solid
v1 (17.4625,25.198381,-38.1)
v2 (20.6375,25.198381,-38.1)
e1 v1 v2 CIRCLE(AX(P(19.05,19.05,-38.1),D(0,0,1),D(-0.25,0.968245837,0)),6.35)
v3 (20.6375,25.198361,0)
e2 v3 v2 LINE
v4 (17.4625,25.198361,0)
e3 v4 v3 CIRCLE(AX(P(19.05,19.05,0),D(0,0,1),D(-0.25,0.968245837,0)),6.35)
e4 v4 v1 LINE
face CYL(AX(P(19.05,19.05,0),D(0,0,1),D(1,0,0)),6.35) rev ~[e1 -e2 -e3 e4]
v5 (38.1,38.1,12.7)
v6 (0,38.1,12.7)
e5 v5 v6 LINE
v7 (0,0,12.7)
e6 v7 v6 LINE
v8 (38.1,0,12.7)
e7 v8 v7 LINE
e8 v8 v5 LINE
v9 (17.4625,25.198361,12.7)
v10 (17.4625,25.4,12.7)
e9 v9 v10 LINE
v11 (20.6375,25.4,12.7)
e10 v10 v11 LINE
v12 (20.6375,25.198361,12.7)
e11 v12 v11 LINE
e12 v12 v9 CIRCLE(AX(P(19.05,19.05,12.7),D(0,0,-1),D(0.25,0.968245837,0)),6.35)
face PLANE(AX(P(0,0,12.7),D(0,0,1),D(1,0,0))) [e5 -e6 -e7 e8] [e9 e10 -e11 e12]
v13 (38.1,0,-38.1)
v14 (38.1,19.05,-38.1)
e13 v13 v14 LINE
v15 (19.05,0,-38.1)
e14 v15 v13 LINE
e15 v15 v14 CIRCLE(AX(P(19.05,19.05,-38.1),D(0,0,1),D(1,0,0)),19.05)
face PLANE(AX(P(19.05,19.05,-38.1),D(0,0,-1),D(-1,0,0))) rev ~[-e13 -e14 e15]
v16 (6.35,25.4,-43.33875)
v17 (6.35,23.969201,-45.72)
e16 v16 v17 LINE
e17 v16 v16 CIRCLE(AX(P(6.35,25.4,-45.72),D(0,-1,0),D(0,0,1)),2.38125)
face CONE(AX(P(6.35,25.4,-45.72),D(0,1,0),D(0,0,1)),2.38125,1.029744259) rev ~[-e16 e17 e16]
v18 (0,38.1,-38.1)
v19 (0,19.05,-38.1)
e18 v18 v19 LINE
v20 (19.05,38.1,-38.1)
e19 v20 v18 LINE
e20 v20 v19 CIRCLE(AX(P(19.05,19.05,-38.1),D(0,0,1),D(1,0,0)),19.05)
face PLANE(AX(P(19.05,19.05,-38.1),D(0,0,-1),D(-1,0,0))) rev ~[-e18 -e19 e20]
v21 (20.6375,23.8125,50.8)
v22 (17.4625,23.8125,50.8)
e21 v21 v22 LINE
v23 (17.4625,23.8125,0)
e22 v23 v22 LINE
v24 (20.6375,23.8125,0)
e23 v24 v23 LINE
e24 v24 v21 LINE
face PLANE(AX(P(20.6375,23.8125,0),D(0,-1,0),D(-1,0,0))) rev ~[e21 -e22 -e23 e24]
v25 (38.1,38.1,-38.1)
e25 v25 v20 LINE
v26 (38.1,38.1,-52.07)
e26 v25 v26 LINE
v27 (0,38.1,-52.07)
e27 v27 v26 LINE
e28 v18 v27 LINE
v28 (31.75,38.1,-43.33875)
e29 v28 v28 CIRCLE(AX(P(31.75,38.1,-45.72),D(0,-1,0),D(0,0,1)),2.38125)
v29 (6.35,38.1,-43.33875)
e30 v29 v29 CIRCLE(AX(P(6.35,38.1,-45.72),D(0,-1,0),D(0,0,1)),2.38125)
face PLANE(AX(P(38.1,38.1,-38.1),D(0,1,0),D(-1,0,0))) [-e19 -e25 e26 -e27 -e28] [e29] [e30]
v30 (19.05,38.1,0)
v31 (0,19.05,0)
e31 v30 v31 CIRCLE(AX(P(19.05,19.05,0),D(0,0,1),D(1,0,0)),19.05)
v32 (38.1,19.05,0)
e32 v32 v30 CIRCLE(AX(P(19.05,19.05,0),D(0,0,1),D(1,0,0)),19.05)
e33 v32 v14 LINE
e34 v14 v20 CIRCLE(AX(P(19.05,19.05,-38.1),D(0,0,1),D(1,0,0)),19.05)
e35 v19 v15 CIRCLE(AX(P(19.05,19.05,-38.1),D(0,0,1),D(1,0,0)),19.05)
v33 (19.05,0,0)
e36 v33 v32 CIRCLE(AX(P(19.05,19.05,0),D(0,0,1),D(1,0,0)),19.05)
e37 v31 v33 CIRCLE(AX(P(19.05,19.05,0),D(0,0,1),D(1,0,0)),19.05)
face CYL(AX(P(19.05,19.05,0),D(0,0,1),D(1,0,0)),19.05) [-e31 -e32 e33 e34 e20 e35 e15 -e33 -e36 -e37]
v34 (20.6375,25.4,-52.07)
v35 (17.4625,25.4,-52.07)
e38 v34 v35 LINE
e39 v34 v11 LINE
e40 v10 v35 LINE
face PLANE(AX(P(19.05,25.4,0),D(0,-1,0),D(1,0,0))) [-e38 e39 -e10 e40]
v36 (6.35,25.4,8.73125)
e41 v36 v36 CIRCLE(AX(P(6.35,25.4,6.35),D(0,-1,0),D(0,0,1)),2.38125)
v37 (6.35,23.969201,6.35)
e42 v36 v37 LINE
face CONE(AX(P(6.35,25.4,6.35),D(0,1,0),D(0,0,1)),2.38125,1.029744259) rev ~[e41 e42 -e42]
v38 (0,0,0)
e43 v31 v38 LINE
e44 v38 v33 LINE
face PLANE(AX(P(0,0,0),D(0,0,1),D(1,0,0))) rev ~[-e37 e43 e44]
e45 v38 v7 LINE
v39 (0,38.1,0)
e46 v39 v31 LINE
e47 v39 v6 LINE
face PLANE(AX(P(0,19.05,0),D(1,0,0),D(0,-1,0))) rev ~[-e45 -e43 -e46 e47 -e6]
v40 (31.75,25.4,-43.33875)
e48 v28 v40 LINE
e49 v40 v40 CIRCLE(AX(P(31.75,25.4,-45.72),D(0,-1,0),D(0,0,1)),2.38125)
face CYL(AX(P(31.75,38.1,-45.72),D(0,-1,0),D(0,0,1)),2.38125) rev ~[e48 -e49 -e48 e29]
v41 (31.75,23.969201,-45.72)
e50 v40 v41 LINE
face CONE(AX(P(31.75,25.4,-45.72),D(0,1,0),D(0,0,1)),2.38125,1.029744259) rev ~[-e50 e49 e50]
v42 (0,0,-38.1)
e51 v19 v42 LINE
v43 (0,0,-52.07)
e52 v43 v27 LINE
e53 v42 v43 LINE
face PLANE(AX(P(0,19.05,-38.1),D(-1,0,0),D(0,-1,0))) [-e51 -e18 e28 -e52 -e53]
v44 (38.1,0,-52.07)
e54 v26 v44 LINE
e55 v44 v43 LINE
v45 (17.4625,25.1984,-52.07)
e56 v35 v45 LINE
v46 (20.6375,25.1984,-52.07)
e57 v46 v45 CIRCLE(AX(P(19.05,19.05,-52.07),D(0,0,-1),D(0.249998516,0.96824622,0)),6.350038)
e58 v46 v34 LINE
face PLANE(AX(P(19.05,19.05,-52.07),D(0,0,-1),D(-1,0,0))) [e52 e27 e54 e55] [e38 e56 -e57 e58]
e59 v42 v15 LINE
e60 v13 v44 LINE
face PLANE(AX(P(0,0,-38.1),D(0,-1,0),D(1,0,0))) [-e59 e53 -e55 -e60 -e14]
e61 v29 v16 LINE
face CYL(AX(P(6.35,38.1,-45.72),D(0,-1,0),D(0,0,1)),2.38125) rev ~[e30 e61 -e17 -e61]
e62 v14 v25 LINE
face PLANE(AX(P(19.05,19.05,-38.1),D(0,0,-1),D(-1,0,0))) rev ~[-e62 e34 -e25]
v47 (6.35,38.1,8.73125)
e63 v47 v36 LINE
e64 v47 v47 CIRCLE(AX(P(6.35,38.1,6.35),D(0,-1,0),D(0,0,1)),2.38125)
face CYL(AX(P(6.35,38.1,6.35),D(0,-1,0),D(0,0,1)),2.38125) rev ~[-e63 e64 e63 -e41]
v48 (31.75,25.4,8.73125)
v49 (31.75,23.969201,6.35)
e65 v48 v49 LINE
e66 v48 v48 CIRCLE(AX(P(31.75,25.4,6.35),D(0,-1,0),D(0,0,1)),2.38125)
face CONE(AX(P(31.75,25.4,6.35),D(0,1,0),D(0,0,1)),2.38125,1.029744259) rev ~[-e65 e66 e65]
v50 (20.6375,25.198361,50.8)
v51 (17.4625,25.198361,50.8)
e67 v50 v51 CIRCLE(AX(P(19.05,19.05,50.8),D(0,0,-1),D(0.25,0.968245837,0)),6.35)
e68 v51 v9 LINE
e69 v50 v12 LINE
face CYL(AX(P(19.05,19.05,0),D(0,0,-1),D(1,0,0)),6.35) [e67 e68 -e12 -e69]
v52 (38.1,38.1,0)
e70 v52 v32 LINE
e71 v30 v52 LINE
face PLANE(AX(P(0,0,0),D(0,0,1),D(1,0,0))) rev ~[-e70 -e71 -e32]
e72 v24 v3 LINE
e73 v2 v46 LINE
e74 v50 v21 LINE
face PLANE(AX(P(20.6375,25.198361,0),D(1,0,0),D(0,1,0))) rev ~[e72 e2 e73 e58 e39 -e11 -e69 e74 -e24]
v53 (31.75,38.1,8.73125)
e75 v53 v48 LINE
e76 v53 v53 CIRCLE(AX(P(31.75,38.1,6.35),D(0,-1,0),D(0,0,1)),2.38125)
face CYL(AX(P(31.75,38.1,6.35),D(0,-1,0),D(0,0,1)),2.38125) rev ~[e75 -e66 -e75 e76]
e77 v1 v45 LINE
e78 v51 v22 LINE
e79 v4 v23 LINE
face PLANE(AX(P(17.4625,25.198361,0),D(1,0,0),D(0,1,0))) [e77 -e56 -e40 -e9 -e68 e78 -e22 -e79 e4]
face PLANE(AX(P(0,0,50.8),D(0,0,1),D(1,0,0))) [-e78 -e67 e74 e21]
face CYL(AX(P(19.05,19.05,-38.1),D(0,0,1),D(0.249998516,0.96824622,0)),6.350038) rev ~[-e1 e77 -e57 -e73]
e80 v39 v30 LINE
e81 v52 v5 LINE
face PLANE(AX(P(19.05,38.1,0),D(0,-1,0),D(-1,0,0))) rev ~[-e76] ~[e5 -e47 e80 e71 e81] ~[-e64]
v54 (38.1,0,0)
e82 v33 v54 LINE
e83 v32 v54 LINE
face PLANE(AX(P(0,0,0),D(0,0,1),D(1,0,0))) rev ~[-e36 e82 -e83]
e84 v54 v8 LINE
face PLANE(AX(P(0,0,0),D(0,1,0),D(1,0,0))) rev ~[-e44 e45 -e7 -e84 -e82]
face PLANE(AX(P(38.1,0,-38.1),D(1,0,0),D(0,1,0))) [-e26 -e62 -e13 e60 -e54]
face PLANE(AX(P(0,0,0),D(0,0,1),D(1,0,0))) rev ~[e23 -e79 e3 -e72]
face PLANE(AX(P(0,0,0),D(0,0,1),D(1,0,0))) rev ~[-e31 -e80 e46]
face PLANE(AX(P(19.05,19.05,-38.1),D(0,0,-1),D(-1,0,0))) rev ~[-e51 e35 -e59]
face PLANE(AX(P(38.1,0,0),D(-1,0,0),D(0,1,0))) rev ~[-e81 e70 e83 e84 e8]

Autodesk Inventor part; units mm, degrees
ref_plane "YZ Plane" through (0, 0, 0) normal (1, 0, 0) x (0, 1, 0)
ref_plane "XZ Plane" through (0, 0, 0) normal (0, 1, 0) x (-1, 0, 0)
ref_plane "XY Plane" through (0, 0, 0) normal (0, 0, 1) x (1, 0, 0)
sketch "Sketch1" plane through (0, 0, 0) normal (0, 0, 1) x (1, 0, 0)
  line L0 (0, 0) -> (38.1, 0)
  line L1 (38.1, 0) -> (38.1, 38.1)
  line L2 (38.1, 38.1) -> (0, 38.1)
  line L3 (0, 38.1) -> (0, 0)
  circle A0 centre (19.05, 19.05) radius 6.35
  line L4 (20.6375, 23.8125) -> (17.4625, 23.8125)
  line L5 (17.4625, 25.4) -> (20.6375, 25.4)
  line L6 (20.6375, 23.8125) -> (20.6375, 25.4)
  line L7 (17.4625, 23.8125) -> (17.4625, 25.4)
  circle A1 centre (19.05, 19.05) radius 19.05
  point P0 (19.05, 0)
  point P1 (0, 19.05)
  point P2 (19.05, 23.8125)
  dimension "d0" = 38.1
  dimension "d1" = 38.1
  dimension "d2" = 12.7
  dimension "d3" = 3.175
extrude "Extrusion1" add sketch "Sketch1" along normal blind 12.7 contours L3 A1 L0 | A1 L1 L0 | A1 | L3 L2 A1 | A1 L2 L1 | A0 L7 L4 L6 | L6 L4 L7 A0
extrude "Extrusion2" add sketch "Sketch1" along normal blind 50.8 contours A0 L7 L4 L6 | L6 L4 L7 A0
extrude "Extrusion3" cut sketch "Sketch1" along normal blind 50.8 contours L6 L4 L7 A0 | A0 L5 L6 | L7 L5 A0 picked at (19.05, 24.3417)
extrude "Extrusion4" add sketch "Sketch1" against normal blind 38.1 contours A1
sketch "Sketch2" plane through (19.05, 19.05, -38.1) normal (0, 0, -1) x (-1, 0, 0)
  arc A0 (-1.5875, 6.1484) -> (1.5875, 6.1484) centre (0, 0) ccw projected
  line L0 (-1.5875, 6.1484) -> (-1.5875, 6.35) projected
  line L1 (-1.5875, 6.35) -> (1.5875, 6.35) projected
  line L2 (1.5875, 6.35) -> (1.5875, 6.1484) projected
  circle A1 centre (0, 0) radius 19.05 projected
  line L3 (-19.05, 19.05) -> (19.05, 19.05)
  line L4 (19.05, 19.05) -> (19.05, -19.05)
  line L5 (19.05, -19.05) -> (-19.05, -19.05)
  line L6 (-19.05, -19.05) -> (-19.05, 19.05)
extrude "Extrusion5" add sketch "Sketch2" along normal blind 13.97
sketch "Sketch3" plane through (0, 38.1, 12.7) normal (0, 1, 0) x (1, 0, 0)
  line L0 (0, 0) -> (38.1, 0) projected
  line L1 (0, 12.7) -> (0, 0) projected
  point P0 (31.75, 6.35)
  point P1 (6.35, 6.35)
  point P2 (6.35, 58.42)
  point P3 (31.75, 58.42)
  point P4 (0, 64.77)
  dimension "d15" = 6.35
  dimension "d16" = 25.4
  dimension "d17" = 6.35
  dimension "d18" = 6.35
hole "Hole1" at (31.75, 38.1, 6.35) at (6.35, 38.1, 6.35) at (6.35, 38.1, -45.72) at (31.75, 38.1, -45.72) direction (0, -1, 0) diameter 4.7625 depth 12.7 tip angle 118
thread "Thread1" size "10-32 UNF" class "2B" standard "ANSI Unified Screw Threads" full length
thread "Thread2" size "10-32 UNF" class "2B" standard "ANSI Unified Screw Threads" full length
thread "Thread3" size "10-24 UNC" class "2B" standard "ANSI Unified Screw Threads" full length
thread "Thread4" size "10-24 UNC" class "2B" standard "ANSI Unified Screw Threads" full length
properties part number "hack_p60"
